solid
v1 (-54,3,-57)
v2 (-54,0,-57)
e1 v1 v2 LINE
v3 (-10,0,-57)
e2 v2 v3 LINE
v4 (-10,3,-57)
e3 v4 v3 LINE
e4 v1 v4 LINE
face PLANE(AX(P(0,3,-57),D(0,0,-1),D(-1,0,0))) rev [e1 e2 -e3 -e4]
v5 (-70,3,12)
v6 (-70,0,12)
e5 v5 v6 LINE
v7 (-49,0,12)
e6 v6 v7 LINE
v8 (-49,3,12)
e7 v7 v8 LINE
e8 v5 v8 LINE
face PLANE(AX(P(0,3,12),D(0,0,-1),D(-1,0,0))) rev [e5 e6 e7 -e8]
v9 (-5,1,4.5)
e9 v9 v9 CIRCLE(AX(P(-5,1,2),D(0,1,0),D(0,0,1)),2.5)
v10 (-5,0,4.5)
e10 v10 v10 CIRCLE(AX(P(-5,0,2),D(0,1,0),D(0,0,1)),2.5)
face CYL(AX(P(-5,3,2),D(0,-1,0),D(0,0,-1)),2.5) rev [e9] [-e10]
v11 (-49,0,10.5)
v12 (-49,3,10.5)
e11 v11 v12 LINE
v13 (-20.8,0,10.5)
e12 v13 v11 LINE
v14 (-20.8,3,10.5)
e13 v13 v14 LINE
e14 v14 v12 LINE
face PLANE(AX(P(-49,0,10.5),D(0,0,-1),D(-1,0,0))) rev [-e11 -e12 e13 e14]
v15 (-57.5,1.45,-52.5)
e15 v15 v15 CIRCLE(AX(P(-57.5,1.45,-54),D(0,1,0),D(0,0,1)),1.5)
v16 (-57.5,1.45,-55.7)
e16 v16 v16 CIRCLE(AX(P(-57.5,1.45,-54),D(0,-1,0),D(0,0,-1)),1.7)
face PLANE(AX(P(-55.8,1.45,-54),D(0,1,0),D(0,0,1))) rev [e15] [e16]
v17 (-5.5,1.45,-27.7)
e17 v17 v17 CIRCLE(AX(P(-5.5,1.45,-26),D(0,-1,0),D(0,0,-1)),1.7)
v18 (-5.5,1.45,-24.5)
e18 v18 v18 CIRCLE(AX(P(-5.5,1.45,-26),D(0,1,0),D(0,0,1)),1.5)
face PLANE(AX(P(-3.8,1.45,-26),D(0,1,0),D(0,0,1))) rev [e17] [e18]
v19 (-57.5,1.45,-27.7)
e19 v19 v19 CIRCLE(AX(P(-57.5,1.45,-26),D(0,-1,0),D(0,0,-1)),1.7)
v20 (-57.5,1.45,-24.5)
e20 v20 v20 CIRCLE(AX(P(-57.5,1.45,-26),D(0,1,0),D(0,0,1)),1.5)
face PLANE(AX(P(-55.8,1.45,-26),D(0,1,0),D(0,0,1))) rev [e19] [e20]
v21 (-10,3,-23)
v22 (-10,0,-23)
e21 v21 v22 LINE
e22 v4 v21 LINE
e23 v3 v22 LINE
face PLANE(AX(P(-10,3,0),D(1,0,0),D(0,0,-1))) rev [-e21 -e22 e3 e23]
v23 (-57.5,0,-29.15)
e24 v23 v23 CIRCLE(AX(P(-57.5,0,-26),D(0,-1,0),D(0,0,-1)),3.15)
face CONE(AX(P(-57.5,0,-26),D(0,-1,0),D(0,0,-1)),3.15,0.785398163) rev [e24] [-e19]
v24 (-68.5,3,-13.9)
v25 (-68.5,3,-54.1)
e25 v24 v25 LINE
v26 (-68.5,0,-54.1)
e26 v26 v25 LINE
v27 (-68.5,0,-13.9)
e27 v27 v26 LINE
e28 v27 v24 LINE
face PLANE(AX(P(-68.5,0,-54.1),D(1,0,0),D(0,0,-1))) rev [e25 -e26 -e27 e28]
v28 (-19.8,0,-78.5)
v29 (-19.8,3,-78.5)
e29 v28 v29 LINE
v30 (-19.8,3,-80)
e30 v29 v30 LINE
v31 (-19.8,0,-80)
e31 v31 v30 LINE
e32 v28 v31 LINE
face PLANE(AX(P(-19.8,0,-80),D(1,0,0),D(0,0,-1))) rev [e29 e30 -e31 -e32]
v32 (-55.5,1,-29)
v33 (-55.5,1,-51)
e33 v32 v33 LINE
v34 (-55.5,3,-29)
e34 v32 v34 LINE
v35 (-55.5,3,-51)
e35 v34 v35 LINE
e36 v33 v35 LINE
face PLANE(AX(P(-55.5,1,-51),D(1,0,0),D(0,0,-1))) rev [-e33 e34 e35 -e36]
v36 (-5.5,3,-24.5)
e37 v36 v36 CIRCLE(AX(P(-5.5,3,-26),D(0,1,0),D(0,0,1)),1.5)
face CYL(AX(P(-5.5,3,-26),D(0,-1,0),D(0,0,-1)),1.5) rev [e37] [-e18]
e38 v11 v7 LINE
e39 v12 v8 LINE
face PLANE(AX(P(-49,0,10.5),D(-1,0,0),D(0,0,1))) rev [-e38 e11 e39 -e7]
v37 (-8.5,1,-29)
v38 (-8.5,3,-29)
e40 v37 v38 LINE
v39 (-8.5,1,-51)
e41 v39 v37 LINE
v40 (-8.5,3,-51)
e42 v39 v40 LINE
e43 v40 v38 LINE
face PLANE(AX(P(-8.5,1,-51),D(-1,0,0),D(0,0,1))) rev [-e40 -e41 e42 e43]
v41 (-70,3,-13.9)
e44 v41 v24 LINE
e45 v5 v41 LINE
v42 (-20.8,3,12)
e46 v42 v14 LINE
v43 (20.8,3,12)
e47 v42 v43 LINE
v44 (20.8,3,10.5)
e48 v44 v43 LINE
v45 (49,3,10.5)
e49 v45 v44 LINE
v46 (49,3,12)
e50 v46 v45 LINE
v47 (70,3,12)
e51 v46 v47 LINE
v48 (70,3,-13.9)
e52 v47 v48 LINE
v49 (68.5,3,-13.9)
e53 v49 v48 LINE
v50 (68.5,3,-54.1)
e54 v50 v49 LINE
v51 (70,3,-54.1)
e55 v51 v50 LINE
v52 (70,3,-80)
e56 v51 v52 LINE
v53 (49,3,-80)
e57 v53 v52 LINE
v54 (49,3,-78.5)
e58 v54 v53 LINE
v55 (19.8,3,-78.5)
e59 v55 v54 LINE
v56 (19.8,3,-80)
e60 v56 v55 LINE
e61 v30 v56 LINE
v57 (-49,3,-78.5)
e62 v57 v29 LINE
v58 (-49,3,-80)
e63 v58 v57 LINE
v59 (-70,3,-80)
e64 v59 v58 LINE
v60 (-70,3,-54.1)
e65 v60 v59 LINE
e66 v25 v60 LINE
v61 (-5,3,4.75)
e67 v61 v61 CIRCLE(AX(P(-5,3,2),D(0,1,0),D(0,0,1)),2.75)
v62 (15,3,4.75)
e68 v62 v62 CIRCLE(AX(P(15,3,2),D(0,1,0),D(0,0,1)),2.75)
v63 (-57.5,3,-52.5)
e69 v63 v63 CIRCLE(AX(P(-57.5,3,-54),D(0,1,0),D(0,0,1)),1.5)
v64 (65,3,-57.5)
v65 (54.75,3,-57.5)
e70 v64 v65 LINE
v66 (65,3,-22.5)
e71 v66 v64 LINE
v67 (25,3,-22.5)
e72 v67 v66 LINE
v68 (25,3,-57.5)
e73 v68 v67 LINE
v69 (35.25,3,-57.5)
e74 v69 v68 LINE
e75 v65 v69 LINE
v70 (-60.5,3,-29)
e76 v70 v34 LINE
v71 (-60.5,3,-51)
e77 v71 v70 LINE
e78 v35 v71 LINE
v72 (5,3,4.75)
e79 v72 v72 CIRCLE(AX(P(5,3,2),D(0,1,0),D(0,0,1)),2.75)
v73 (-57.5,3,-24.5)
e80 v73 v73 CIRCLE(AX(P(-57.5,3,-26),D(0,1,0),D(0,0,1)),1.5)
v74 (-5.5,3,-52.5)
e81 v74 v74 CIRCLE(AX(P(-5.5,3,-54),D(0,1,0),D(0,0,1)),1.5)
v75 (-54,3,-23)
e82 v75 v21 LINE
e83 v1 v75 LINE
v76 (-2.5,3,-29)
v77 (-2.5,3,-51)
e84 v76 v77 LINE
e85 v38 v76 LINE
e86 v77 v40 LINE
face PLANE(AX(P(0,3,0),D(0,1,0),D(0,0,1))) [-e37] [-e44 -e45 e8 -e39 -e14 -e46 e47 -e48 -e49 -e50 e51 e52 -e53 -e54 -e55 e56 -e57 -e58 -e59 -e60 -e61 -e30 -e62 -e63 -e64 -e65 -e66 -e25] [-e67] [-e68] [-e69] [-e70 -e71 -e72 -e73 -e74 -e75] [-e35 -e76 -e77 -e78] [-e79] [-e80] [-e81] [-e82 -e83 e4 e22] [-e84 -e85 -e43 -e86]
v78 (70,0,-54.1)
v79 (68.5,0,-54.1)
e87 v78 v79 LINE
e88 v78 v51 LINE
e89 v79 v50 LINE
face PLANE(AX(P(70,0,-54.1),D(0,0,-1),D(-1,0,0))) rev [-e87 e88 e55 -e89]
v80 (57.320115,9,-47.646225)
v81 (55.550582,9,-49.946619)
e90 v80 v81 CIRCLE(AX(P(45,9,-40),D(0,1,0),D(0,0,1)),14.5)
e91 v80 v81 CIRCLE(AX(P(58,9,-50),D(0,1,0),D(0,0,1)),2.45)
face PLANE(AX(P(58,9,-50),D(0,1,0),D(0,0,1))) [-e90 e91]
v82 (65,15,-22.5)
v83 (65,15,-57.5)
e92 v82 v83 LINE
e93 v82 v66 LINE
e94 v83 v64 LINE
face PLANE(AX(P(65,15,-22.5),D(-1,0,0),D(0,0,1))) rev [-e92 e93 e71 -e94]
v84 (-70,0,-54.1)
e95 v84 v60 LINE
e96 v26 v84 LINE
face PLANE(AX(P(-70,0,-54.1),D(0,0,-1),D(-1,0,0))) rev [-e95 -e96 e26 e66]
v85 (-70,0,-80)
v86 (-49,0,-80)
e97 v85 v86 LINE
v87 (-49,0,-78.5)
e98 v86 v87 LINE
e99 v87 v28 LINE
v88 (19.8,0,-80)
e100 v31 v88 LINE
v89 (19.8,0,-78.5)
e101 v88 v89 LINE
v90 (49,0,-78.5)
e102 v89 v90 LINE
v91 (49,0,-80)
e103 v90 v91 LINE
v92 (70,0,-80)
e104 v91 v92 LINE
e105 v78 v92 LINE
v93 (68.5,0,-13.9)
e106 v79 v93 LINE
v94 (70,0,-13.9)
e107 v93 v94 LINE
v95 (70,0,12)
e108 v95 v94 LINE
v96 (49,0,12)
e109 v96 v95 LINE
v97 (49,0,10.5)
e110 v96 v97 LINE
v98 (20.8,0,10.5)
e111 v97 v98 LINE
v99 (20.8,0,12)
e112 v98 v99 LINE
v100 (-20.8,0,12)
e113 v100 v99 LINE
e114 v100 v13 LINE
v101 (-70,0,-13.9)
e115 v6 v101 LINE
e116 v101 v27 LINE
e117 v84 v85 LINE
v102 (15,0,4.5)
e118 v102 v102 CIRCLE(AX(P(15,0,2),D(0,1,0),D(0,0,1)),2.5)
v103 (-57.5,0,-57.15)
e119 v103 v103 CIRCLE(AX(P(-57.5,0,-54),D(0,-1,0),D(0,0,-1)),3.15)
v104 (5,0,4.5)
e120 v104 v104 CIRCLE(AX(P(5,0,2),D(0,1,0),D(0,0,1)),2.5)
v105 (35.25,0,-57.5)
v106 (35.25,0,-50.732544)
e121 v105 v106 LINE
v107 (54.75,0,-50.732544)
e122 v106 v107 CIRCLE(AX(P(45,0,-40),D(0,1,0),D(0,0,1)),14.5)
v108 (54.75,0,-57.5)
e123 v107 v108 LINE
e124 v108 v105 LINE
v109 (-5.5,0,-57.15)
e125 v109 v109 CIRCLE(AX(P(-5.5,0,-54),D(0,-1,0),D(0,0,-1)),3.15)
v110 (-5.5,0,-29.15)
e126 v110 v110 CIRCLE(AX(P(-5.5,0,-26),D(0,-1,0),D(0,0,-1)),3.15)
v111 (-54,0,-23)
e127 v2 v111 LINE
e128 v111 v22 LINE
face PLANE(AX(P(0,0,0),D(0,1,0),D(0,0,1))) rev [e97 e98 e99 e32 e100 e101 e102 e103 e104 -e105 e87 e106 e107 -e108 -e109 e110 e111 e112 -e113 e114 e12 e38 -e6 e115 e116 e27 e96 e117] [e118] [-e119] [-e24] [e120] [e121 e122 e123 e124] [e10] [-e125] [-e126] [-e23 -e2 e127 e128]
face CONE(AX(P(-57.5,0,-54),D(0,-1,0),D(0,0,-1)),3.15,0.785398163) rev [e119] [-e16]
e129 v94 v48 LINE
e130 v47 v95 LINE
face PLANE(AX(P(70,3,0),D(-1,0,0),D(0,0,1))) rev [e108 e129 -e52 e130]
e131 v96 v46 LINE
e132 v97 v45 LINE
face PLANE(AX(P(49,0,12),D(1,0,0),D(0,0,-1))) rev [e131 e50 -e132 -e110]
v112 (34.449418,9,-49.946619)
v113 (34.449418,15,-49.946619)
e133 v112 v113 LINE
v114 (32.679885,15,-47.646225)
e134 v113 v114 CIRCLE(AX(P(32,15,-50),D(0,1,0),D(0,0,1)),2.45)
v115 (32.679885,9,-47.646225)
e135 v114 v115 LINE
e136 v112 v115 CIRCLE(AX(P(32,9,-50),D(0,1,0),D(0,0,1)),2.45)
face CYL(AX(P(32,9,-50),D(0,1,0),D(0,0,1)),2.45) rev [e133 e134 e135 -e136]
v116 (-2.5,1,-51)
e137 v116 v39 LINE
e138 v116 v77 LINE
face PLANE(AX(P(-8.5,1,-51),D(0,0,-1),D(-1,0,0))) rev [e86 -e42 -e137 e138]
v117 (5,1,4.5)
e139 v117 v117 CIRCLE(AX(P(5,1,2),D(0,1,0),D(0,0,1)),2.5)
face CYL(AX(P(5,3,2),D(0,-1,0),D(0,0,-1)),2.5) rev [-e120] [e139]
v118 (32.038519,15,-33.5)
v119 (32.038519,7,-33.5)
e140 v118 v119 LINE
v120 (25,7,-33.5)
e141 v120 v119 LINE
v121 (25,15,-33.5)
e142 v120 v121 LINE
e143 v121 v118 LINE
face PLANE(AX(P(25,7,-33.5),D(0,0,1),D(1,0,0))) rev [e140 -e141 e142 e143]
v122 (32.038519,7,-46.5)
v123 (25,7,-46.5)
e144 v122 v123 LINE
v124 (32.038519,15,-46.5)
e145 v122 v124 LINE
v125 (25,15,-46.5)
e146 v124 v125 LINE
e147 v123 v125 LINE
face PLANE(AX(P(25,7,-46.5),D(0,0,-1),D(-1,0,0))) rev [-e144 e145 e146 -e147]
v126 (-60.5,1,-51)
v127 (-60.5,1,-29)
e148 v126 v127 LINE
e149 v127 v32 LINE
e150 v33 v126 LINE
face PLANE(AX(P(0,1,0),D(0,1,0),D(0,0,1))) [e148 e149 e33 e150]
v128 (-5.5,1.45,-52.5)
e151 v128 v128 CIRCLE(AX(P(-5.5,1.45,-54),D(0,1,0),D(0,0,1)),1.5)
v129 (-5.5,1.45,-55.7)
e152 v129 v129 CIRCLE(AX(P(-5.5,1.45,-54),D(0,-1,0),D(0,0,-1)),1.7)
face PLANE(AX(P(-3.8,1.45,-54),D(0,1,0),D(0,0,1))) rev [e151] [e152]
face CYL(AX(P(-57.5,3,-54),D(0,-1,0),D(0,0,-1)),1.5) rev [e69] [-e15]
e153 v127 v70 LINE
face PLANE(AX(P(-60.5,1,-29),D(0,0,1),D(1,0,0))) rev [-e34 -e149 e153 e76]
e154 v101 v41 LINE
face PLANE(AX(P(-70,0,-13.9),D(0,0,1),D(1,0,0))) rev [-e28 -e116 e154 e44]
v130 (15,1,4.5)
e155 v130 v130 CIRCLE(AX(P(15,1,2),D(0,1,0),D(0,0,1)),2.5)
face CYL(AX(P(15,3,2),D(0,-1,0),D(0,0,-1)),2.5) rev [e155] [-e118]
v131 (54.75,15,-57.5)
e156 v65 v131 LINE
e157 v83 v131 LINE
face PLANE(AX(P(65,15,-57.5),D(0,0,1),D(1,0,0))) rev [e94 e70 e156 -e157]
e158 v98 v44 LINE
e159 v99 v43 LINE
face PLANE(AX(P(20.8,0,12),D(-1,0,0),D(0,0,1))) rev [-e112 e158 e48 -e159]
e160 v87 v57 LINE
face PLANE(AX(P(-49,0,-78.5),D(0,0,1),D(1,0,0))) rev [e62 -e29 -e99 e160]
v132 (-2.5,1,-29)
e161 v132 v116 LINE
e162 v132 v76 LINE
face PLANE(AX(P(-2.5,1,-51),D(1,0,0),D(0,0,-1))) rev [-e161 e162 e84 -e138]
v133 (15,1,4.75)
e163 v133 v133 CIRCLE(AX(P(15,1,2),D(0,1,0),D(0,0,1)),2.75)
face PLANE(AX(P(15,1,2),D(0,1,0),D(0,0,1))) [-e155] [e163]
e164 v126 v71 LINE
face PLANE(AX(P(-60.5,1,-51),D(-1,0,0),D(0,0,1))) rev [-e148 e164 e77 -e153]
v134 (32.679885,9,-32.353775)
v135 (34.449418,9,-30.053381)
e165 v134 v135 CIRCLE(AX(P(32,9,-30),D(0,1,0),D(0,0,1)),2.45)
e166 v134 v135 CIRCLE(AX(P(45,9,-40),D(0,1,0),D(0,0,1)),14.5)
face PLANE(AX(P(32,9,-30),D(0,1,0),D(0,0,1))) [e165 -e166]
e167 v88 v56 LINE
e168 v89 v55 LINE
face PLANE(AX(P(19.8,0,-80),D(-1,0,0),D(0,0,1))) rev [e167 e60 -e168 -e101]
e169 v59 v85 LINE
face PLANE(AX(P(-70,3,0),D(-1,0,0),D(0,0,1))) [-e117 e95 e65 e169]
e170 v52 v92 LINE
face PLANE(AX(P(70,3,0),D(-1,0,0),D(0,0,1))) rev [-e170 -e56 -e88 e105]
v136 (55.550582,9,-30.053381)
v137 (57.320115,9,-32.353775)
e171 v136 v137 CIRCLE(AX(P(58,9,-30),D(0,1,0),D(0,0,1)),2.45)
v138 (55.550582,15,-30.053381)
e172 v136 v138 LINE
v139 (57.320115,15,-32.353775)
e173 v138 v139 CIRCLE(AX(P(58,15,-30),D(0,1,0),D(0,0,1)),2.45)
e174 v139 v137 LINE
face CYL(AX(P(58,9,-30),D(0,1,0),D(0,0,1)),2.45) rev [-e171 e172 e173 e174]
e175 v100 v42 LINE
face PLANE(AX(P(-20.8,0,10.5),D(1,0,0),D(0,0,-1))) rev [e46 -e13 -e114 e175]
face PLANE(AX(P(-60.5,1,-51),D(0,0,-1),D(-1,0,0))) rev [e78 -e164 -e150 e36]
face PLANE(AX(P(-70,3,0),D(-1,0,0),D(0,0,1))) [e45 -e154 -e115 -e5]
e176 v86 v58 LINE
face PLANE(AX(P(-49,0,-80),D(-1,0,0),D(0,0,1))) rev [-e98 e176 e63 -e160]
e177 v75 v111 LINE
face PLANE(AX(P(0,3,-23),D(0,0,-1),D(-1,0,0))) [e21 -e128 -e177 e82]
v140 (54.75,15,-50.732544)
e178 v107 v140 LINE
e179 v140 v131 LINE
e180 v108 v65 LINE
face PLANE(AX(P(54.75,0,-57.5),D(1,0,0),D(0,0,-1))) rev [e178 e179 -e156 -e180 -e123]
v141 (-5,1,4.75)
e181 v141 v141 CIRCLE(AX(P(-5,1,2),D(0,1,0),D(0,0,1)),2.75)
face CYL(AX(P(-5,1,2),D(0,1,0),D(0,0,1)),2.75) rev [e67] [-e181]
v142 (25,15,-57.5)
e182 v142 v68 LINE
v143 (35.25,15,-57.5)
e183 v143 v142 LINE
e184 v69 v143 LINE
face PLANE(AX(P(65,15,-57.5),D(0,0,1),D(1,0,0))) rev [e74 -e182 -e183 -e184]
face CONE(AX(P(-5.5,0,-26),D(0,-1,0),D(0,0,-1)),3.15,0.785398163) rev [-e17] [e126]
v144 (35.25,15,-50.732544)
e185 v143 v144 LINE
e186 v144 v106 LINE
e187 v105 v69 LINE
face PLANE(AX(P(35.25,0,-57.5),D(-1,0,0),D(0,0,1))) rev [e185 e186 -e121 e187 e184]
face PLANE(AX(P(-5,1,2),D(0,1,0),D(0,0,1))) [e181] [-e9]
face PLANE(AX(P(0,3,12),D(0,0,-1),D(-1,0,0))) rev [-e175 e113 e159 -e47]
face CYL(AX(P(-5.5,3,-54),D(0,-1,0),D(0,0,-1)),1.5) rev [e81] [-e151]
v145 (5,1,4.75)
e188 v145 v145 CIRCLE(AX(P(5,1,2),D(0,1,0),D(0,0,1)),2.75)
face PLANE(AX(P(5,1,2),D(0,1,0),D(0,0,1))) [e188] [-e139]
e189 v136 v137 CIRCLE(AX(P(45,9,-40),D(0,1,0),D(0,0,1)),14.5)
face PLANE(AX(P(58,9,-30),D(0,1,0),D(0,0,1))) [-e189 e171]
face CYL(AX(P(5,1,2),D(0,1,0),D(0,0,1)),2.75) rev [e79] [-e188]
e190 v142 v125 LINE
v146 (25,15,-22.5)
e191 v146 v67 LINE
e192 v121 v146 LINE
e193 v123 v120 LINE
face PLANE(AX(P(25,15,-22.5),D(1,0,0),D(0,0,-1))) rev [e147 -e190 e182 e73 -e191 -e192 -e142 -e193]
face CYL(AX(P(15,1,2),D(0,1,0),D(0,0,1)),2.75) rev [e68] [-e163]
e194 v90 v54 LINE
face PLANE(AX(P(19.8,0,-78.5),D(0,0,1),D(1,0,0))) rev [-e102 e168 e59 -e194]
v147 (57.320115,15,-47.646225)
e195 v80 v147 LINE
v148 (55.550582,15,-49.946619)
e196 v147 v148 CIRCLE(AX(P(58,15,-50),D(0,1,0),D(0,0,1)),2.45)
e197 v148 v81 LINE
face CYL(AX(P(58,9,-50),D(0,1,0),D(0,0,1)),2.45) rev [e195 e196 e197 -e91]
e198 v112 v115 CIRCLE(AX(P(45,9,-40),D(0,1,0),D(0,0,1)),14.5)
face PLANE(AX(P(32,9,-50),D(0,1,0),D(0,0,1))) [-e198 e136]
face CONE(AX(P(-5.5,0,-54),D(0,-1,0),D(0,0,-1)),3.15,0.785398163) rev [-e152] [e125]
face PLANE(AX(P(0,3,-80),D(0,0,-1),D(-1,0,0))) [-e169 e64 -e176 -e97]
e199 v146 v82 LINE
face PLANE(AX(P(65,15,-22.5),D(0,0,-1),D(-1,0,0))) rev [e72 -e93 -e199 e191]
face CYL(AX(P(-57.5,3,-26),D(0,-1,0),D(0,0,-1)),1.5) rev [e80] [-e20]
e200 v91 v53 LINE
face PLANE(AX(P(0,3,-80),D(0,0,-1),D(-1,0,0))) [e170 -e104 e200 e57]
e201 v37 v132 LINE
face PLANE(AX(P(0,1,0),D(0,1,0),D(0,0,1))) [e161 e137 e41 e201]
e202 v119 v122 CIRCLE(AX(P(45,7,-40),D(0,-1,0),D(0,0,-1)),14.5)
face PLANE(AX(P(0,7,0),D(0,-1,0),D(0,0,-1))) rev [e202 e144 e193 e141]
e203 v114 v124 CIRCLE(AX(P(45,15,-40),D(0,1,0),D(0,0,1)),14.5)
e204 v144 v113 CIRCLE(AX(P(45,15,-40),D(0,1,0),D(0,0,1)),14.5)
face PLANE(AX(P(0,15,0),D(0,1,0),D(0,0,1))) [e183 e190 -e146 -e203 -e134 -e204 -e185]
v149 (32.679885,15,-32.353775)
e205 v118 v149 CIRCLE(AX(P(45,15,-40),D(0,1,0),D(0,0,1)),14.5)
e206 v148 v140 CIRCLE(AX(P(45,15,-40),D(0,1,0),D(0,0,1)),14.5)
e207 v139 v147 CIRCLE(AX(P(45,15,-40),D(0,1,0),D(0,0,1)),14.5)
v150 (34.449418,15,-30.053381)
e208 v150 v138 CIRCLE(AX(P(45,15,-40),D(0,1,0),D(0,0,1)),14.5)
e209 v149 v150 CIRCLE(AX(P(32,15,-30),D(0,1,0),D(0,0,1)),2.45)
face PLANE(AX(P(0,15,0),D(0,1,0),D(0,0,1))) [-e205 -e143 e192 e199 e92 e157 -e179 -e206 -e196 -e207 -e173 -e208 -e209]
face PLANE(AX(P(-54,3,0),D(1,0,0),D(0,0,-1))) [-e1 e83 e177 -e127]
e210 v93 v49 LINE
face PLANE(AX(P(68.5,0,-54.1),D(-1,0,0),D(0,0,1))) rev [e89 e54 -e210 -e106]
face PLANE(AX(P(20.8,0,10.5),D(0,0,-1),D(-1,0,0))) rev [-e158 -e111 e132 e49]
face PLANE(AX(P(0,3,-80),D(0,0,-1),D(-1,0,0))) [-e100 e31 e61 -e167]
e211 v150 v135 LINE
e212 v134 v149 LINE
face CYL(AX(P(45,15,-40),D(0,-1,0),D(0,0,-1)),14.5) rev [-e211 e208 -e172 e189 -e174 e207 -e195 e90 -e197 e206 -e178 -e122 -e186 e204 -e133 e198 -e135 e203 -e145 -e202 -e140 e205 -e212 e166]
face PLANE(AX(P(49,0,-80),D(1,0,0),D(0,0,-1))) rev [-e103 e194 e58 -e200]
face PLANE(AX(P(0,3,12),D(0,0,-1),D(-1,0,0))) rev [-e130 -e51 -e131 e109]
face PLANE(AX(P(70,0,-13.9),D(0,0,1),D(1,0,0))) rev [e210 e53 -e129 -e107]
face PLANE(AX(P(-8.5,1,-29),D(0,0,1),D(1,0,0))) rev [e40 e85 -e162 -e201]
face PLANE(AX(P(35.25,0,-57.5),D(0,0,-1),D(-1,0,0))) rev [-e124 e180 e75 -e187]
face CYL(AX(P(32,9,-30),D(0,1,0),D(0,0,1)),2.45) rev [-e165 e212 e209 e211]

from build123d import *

# Parameters (mm, degrees)
SKETCH1_W                   = 140
SKETCH1_H                   = 92
SKETCH1_R                   = 2.5
SKETCH1_R_2                 = 1.5
SKETCH1_W_2                 = 44
SKETCH1_H_2                 = 34
BOSS_EXTRUDE2_DEPTH         = 3
SKETCH3_W                   = 40
SKETCH3_H                   = 35
SKETCH3_R                   = 14.5
BOSS_EXTRUDE3_DEPTH         = 12
SKETCH5_R                   = 2.45
CUT_EXTRUDE1_DEPTH          = 6
SKETCH6_W                   = 9
SKETCH6_H                   = 13
CUT_EXTRUDE3_DEPTH          = 8
SKETCH8_W                   = 29.2
SKETCH8_H                   = 1.5
SKETCH8_W_2                 = 1.5
SKETCH8_H_2                 = 40.2
SKETCH8_W_3                 = 28.2
CUT_EXTRUDE4_DEPTH          = 107.976632963
SKETCH10_R                  = 14.5
CUT_EXTRUDE5_DEPTH          = 107.976632963
SKETCH11_W                  = 19.5
SKETCH11_H                  = 8
CUT_EXTRUDE6_DEPTH          = 108.354552768
SKETCH12_R                  = 2.75
CUT_EXTRUDE7_DEPTH          = 2
SKETCH13_W                  = 5
SKETCH13_H                  = 22
SKETCH13_W_2                = 6
CUT_EXTRUDE8_DEPTH          = 2
ADVANCEDHOLE1_OUTLINE_R     = 1.7
ADVANCEDHOLE1_OUTLINE_R_2   = 1.5
ADVANCEDHOLE1_DEPTH         = 1.45
ADVANCEDHOLE1_DRAFT         = 45
ADVANCEDHOLE1_2_OUTLINE_R   = 1.7
ADVANCEDHOLE1_2_OUTLINE_R_2 = 1.5
ADVANCEDHOLE1_2_DEPTH       = 1.45
ADVANCEDHOLE1_2_DRAFT       = 45
ADVANCEDHOLE1_3_OUTLINE_R   = 1.7
ADVANCEDHOLE1_3_OUTLINE_R_2 = 1.5
ADVANCEDHOLE1_3_DEPTH       = 1.45
ADVANCEDHOLE1_3_DRAFT       = 45
ADVANCEDHOLE1_4_OUTLINE_R   = 1.7
ADVANCEDHOLE1_4_OUTLINE_R_2 = 1.5
ADVANCEDHOLE1_4_DEPTH       = 1.45
ADVANCEDHOLE1_4_DRAFT       = 45


# Read off the part's stored shape, not the designer's step: AdvancedHole1
with BuildPart() as part:
    # Sketch1 → Boss-Extrude2 (new body)
    with BuildSketch(Plane(origin=(0, 0, 0), x_dir=(1, 0, 0), z_dir=(0, 1, 0))):
        with Locations((0, 34)):
            Rectangle(SKETCH1_W, SKETCH1_H)
        with Locations(Location((-5, -2, 0), (0, 0, 270))):
            Circle(SKETCH1_R, mode=Mode.SUBTRACT)
        with Locations(Location((-57.5, 26, 0), (0, 0, 270))):
            Circle(SKETCH1_R_2, mode=Mode.SUBTRACT)
        with Locations(Location((-5.5, 26, 0), (0, 0, 270))):
            Circle(SKETCH1_R_2, mode=Mode.SUBTRACT)
        with Locations(Location((5, -2, 0), (0, 0, 270))):
            Circle(SKETCH1_R, mode=Mode.SUBTRACT)
        with Locations(Location((15, -2, 0), (0, 0, 270))):
            Circle(SKETCH1_R, mode=Mode.SUBTRACT)
        with Locations((-32, 40)):
            Rectangle(SKETCH1_W_2, SKETCH1_H_2, mode=Mode.SUBTRACT)
        with Locations(Location((-57.5, 54, 0), (0, 0, 270))):
            Circle(SKETCH1_R_2, mode=Mode.SUBTRACT)
        with Locations(Location((-5.5, 54, 0), (0, 0, 270))):
            Circle(SKETCH1_R_2, mode=Mode.SUBTRACT)
        with BuildLine():
            ThreePointArc((33.523109919, 48.017542895), (33.981559973, 48.475723098), (34.306815732, 49.036360451))
            ThreePointArc((34.306815732, 49.036360451), (45, 54), (55.693184268, 49.036360451))
            ThreePointArc((55.693184268, 49.036360451), (56.018440027, 48.475723098), (56.476890081, 48.017542895))
            ThreePointArc((56.476890081, 48.017542895), (45, 26), (33.523109919, 48.017542895))
        make_face(mode=Mode.SUBTRACT)
    extrude(amount=BOSS_EXTRUDE2_DEPTH)

    # Sketch3 → Boss-Extrude3 (add)
    with BuildSketch(Plane(origin=(0, 3, 0), x_dir=(1, 0, 0), z_dir=(0, 1, 0))):
        with Locations((45, 40)):
            Rectangle(SKETCH3_W, SKETCH3_H)
        with Locations(Location((45, 40, 0), (0, 0, 270))):
            Circle(SKETCH3_R, mode=Mode.SUBTRACT)
    extrude(amount=BOSS_EXTRUDE3_DEPTH)

    # Sketch5 → Cut-Extrude1 (cut)
    with BuildSketch(Plane(origin=(0, 15, 0), x_dir=(1, 0, 0), z_dir=(0, 1, 0))):
        with Locations((32, 50)):
            Circle(SKETCH5_R)
        with Locations((58, 50)):
            Circle(SKETCH5_R)
        with Locations((58, 30)):
            Circle(SKETCH5_R)
        with Locations((32, 30)):
            Circle(SKETCH5_R)
    extrude(amount=-CUT_EXTRUDE1_DEPTH, mode=Mode.SUBTRACT)

    # Sketch6 → Cut-Extrude3 (cut)
    with BuildSketch(Plane(origin=(0, 15, 0), x_dir=(1, 0, 0), z_dir=(0, 1, 0))):
        with Locations((29.5, 40)):
            Rectangle(SKETCH6_W, SKETCH6_H)
    extrude(amount=-CUT_EXTRUDE3_DEPTH, mode=Mode.SUBTRACT)

    # Sketch8 → Cut-Extrude4 (cut, through all)
    with BuildSketch(Plane(origin=(0, 3, 0), x_dir=(1, 0, 0), z_dir=(0, 1, 0))):
        with Locations((-34.4, 79.25)):
            Rectangle(SKETCH8_W, SKETCH8_H)
        with Locations((34.4, 79.25)):
            Rectangle(SKETCH8_W, SKETCH8_H)
        with Locations((69.25, 34)):
            Rectangle(SKETCH8_W_2, SKETCH8_H_2)
        with Locations((-69.25, 34)):
            Rectangle(SKETCH8_W_2, SKETCH8_H_2)
        with Locations((-34.9, -11.25)):
            Rectangle(SKETCH8_W_3, SKETCH8_H)
        with Locations((34.9, -11.25)):
            Rectangle(SKETCH8_W_3, SKETCH8_H)
    extrude(amount=-CUT_EXTRUDE4_DEPTH, mode=Mode.SUBTRACT)

    # Sketch10 → Cut-Extrude5 (cut, through all)
    with BuildSketch(Plane(origin=(0, 3, 0), x_dir=(1, 0, 0), z_dir=(0, 1, 0))):
        with Locations(Location((45, 40, 0), (0, 0, 136.687767262))):
            Circle(SKETCH10_R)
    extrude(amount=-CUT_EXTRUDE5_DEPTH, mode=Mode.SUBTRACT)

    # Sketch11 → Cut-Extrude6 (cut, through all)
    with BuildSketch(Plane(origin=(0, 15, 0), x_dir=(1, 0, 0), z_dir=(0, 1, 0))):
        with Locations((45, 53.5)):
            Rectangle(SKETCH11_W, SKETCH11_H)
    extrude(amount=-CUT_EXTRUDE6_DEPTH, mode=Mode.SUBTRACT)

    # Sketch12 → Cut-Extrude7 (cut)
    with BuildSketch(Plane(origin=(0, 3, 0), x_dir=(1, 0, 0), z_dir=(0, 1, 0))):
        with Locations(Location((-5, -2, 0), (0, 0, 270))):
            Circle(SKETCH12_R)
        with Locations(Location((5, -2, 0), (0, 0, 270))):
            Circle(SKETCH12_R)
        with Locations(Location((15, -2, 0), (0, 0, 270))):
            Circle(SKETCH12_R)
    extrude(amount=-CUT_EXTRUDE7_DEPTH, mode=Mode.SUBTRACT)

    # Sketch13 → Cut-Extrude8 (cut)
    with BuildSketch(Plane(origin=(0, 3, 0), x_dir=(1, 0, 0), z_dir=(0, 1, 0))):
        with Locations((-58, 40)):
            Rectangle(SKETCH13_W, SKETCH13_H)
        with Locations((-5.5, 40)):
            Rectangle(SKETCH13_W_2, SKETCH13_H)
    extrude(amount=-CUT_EXTRUDE8_DEPTH, mode=Mode.SUBTRACT)


with BuildPart() as advancedhole1_tool:
    # AdvancedHole1 outline → AdvancedHole1 (with draft: the straight prism first)
    with BuildSketch(Plane(origin=(0, 1.45, 0), x_dir=(1, 0, 0), z_dir=(0, 1, 0))):
        with Locations((-57.5, 54)):
            Circle(ADVANCEDHOLE1_OUTLINE_R)
        with Locations((-57.5, 54)):
            Circle(ADVANCEDHOLE1_OUTLINE_R_2, mode=Mode.SUBTRACT)
    extrude(amount=-ADVANCEDHOLE1_DEPTH)
    # AdvancedHole1: the draft: its side faces are tilted about the plane it starts from
    advancedhole1_sides = [advancedhole1_tool.faces().sort_by_distance(p)[0] for p in [
        (-59.2, 0.725, -54),
        (-59, 0.725, -54),
    ]]
    draft(advancedhole1_sides, Plane(origin=(0, 1.45, 0), x_dir=(1, 0, 0), z_dir=(0, 1, 0)), ADVANCEDHOLE1_DRAFT)


with BuildPart() as part_1:
    add(part.part)

    # AdvancedHole1: cut by advancedhole1_tool
    add(advancedhole1_tool.part, mode=Mode.SUBTRACT)


with BuildPart() as advancedhole1_2_tool:
    # AdvancedHole1 2 outline → AdvancedHole1 2 (with draft: the straight prism first)
    with BuildSketch(Plane(origin=(0, 1.45, 0), x_dir=(1, 0, 0), z_dir=(0, 1, 0))):
        with Locations((-57.5, 26)):
            Circle(ADVANCEDHOLE1_2_OUTLINE_R)
        with Locations((-57.5, 26)):
            Circle(ADVANCEDHOLE1_2_OUTLINE_R_2, mode=Mode.SUBTRACT)
    extrude(amount=-ADVANCEDHOLE1_2_DEPTH)
    # AdvancedHole1 2: the draft: its side faces are tilted about the plane it starts from
    advancedhole1_2_sides = [advancedhole1_2_tool.faces().sort_by_distance(p)[0] for p in [
        (-59.2, 0.725, -26),
        (-59, 0.725, -26),
    ]]
    draft(advancedhole1_2_sides, Plane(origin=(0, 1.45, 0), x_dir=(1, 0, 0), z_dir=(0, 1, 0)), ADVANCEDHOLE1_2_DRAFT)


with BuildPart() as part_2:
    add(part_1.part)

    # AdvancedHole1 2: cut by advancedhole1_2_tool
    add(advancedhole1_2_tool.part, mode=Mode.SUBTRACT)


with BuildPart() as advancedhole1_3_tool:
    # AdvancedHole1 3 outline → AdvancedHole1 3 (with draft: the straight prism first)
    with BuildSketch(Plane(origin=(0, 1.45, 0), x_dir=(1, 0, 0), z_dir=(0, 1, 0))):
        with Locations((-5.5, 26)):
            Circle(ADVANCEDHOLE1_3_OUTLINE_R)
        with Locations((-5.5, 26)):
            Circle(ADVANCEDHOLE1_3_OUTLINE_R_2, mode=Mode.SUBTRACT)
    extrude(amount=-ADVANCEDHOLE1_3_DEPTH)
    # AdvancedHole1 3: the draft: its side faces are tilted about the plane it starts from
    advancedhole1_3_sides = [advancedhole1_3_tool.faces().sort_by_distance(p)[0] for p in [
        (-7.2, 0.725, -26),
        (-7, 0.725, -26),
    ]]
    draft(advancedhole1_3_sides, Plane(origin=(0, 1.45, 0), x_dir=(1, 0, 0), z_dir=(0, 1, 0)), ADVANCEDHOLE1_3_DRAFT)


with BuildPart() as part_3:
    add(part_2.part)

    # AdvancedHole1 3: cut by advancedhole1_3_tool
    add(advancedhole1_3_tool.part, mode=Mode.SUBTRACT)


with BuildPart() as advancedhole1_4_tool:
    # AdvancedHole1 4 outline → AdvancedHole1 4 (with draft: the straight prism first)
    with BuildSketch(Plane(origin=(0, 1.45, 0), x_dir=(1, 0, 0), z_dir=(0, 1, 0))):
        with Locations((-5.5, 54)):
            Circle(ADVANCEDHOLE1_4_OUTLINE_R)
        with Locations((-5.5, 54)):
            Circle(ADVANCEDHOLE1_4_OUTLINE_R_2, mode=Mode.SUBTRACT)
    extrude(amount=-ADVANCEDHOLE1_4_DEPTH)
    # AdvancedHole1 4: the draft: its side faces are tilted about the plane it starts from
    advancedhole1_4_sides = [advancedhole1_4_tool.faces().sort_by_distance(p)[0] for p in [
        (-7.2, 0.725, -54),
        (-7, 0.725, -54),
    ]]
    draft(advancedhole1_4_sides, Plane(origin=(0, 1.45, 0), x_dir=(1, 0, 0), z_dir=(0, 1, 0)), ADVANCEDHOLE1_4_DRAFT)


with BuildPart() as part_4:
    add(part_3.part)

    # AdvancedHole1 4: cut by advancedhole1_4_tool
    add(advancedhole1_4_tool.part, mode=Mode.SUBTRACT)


solid = part_4.part
